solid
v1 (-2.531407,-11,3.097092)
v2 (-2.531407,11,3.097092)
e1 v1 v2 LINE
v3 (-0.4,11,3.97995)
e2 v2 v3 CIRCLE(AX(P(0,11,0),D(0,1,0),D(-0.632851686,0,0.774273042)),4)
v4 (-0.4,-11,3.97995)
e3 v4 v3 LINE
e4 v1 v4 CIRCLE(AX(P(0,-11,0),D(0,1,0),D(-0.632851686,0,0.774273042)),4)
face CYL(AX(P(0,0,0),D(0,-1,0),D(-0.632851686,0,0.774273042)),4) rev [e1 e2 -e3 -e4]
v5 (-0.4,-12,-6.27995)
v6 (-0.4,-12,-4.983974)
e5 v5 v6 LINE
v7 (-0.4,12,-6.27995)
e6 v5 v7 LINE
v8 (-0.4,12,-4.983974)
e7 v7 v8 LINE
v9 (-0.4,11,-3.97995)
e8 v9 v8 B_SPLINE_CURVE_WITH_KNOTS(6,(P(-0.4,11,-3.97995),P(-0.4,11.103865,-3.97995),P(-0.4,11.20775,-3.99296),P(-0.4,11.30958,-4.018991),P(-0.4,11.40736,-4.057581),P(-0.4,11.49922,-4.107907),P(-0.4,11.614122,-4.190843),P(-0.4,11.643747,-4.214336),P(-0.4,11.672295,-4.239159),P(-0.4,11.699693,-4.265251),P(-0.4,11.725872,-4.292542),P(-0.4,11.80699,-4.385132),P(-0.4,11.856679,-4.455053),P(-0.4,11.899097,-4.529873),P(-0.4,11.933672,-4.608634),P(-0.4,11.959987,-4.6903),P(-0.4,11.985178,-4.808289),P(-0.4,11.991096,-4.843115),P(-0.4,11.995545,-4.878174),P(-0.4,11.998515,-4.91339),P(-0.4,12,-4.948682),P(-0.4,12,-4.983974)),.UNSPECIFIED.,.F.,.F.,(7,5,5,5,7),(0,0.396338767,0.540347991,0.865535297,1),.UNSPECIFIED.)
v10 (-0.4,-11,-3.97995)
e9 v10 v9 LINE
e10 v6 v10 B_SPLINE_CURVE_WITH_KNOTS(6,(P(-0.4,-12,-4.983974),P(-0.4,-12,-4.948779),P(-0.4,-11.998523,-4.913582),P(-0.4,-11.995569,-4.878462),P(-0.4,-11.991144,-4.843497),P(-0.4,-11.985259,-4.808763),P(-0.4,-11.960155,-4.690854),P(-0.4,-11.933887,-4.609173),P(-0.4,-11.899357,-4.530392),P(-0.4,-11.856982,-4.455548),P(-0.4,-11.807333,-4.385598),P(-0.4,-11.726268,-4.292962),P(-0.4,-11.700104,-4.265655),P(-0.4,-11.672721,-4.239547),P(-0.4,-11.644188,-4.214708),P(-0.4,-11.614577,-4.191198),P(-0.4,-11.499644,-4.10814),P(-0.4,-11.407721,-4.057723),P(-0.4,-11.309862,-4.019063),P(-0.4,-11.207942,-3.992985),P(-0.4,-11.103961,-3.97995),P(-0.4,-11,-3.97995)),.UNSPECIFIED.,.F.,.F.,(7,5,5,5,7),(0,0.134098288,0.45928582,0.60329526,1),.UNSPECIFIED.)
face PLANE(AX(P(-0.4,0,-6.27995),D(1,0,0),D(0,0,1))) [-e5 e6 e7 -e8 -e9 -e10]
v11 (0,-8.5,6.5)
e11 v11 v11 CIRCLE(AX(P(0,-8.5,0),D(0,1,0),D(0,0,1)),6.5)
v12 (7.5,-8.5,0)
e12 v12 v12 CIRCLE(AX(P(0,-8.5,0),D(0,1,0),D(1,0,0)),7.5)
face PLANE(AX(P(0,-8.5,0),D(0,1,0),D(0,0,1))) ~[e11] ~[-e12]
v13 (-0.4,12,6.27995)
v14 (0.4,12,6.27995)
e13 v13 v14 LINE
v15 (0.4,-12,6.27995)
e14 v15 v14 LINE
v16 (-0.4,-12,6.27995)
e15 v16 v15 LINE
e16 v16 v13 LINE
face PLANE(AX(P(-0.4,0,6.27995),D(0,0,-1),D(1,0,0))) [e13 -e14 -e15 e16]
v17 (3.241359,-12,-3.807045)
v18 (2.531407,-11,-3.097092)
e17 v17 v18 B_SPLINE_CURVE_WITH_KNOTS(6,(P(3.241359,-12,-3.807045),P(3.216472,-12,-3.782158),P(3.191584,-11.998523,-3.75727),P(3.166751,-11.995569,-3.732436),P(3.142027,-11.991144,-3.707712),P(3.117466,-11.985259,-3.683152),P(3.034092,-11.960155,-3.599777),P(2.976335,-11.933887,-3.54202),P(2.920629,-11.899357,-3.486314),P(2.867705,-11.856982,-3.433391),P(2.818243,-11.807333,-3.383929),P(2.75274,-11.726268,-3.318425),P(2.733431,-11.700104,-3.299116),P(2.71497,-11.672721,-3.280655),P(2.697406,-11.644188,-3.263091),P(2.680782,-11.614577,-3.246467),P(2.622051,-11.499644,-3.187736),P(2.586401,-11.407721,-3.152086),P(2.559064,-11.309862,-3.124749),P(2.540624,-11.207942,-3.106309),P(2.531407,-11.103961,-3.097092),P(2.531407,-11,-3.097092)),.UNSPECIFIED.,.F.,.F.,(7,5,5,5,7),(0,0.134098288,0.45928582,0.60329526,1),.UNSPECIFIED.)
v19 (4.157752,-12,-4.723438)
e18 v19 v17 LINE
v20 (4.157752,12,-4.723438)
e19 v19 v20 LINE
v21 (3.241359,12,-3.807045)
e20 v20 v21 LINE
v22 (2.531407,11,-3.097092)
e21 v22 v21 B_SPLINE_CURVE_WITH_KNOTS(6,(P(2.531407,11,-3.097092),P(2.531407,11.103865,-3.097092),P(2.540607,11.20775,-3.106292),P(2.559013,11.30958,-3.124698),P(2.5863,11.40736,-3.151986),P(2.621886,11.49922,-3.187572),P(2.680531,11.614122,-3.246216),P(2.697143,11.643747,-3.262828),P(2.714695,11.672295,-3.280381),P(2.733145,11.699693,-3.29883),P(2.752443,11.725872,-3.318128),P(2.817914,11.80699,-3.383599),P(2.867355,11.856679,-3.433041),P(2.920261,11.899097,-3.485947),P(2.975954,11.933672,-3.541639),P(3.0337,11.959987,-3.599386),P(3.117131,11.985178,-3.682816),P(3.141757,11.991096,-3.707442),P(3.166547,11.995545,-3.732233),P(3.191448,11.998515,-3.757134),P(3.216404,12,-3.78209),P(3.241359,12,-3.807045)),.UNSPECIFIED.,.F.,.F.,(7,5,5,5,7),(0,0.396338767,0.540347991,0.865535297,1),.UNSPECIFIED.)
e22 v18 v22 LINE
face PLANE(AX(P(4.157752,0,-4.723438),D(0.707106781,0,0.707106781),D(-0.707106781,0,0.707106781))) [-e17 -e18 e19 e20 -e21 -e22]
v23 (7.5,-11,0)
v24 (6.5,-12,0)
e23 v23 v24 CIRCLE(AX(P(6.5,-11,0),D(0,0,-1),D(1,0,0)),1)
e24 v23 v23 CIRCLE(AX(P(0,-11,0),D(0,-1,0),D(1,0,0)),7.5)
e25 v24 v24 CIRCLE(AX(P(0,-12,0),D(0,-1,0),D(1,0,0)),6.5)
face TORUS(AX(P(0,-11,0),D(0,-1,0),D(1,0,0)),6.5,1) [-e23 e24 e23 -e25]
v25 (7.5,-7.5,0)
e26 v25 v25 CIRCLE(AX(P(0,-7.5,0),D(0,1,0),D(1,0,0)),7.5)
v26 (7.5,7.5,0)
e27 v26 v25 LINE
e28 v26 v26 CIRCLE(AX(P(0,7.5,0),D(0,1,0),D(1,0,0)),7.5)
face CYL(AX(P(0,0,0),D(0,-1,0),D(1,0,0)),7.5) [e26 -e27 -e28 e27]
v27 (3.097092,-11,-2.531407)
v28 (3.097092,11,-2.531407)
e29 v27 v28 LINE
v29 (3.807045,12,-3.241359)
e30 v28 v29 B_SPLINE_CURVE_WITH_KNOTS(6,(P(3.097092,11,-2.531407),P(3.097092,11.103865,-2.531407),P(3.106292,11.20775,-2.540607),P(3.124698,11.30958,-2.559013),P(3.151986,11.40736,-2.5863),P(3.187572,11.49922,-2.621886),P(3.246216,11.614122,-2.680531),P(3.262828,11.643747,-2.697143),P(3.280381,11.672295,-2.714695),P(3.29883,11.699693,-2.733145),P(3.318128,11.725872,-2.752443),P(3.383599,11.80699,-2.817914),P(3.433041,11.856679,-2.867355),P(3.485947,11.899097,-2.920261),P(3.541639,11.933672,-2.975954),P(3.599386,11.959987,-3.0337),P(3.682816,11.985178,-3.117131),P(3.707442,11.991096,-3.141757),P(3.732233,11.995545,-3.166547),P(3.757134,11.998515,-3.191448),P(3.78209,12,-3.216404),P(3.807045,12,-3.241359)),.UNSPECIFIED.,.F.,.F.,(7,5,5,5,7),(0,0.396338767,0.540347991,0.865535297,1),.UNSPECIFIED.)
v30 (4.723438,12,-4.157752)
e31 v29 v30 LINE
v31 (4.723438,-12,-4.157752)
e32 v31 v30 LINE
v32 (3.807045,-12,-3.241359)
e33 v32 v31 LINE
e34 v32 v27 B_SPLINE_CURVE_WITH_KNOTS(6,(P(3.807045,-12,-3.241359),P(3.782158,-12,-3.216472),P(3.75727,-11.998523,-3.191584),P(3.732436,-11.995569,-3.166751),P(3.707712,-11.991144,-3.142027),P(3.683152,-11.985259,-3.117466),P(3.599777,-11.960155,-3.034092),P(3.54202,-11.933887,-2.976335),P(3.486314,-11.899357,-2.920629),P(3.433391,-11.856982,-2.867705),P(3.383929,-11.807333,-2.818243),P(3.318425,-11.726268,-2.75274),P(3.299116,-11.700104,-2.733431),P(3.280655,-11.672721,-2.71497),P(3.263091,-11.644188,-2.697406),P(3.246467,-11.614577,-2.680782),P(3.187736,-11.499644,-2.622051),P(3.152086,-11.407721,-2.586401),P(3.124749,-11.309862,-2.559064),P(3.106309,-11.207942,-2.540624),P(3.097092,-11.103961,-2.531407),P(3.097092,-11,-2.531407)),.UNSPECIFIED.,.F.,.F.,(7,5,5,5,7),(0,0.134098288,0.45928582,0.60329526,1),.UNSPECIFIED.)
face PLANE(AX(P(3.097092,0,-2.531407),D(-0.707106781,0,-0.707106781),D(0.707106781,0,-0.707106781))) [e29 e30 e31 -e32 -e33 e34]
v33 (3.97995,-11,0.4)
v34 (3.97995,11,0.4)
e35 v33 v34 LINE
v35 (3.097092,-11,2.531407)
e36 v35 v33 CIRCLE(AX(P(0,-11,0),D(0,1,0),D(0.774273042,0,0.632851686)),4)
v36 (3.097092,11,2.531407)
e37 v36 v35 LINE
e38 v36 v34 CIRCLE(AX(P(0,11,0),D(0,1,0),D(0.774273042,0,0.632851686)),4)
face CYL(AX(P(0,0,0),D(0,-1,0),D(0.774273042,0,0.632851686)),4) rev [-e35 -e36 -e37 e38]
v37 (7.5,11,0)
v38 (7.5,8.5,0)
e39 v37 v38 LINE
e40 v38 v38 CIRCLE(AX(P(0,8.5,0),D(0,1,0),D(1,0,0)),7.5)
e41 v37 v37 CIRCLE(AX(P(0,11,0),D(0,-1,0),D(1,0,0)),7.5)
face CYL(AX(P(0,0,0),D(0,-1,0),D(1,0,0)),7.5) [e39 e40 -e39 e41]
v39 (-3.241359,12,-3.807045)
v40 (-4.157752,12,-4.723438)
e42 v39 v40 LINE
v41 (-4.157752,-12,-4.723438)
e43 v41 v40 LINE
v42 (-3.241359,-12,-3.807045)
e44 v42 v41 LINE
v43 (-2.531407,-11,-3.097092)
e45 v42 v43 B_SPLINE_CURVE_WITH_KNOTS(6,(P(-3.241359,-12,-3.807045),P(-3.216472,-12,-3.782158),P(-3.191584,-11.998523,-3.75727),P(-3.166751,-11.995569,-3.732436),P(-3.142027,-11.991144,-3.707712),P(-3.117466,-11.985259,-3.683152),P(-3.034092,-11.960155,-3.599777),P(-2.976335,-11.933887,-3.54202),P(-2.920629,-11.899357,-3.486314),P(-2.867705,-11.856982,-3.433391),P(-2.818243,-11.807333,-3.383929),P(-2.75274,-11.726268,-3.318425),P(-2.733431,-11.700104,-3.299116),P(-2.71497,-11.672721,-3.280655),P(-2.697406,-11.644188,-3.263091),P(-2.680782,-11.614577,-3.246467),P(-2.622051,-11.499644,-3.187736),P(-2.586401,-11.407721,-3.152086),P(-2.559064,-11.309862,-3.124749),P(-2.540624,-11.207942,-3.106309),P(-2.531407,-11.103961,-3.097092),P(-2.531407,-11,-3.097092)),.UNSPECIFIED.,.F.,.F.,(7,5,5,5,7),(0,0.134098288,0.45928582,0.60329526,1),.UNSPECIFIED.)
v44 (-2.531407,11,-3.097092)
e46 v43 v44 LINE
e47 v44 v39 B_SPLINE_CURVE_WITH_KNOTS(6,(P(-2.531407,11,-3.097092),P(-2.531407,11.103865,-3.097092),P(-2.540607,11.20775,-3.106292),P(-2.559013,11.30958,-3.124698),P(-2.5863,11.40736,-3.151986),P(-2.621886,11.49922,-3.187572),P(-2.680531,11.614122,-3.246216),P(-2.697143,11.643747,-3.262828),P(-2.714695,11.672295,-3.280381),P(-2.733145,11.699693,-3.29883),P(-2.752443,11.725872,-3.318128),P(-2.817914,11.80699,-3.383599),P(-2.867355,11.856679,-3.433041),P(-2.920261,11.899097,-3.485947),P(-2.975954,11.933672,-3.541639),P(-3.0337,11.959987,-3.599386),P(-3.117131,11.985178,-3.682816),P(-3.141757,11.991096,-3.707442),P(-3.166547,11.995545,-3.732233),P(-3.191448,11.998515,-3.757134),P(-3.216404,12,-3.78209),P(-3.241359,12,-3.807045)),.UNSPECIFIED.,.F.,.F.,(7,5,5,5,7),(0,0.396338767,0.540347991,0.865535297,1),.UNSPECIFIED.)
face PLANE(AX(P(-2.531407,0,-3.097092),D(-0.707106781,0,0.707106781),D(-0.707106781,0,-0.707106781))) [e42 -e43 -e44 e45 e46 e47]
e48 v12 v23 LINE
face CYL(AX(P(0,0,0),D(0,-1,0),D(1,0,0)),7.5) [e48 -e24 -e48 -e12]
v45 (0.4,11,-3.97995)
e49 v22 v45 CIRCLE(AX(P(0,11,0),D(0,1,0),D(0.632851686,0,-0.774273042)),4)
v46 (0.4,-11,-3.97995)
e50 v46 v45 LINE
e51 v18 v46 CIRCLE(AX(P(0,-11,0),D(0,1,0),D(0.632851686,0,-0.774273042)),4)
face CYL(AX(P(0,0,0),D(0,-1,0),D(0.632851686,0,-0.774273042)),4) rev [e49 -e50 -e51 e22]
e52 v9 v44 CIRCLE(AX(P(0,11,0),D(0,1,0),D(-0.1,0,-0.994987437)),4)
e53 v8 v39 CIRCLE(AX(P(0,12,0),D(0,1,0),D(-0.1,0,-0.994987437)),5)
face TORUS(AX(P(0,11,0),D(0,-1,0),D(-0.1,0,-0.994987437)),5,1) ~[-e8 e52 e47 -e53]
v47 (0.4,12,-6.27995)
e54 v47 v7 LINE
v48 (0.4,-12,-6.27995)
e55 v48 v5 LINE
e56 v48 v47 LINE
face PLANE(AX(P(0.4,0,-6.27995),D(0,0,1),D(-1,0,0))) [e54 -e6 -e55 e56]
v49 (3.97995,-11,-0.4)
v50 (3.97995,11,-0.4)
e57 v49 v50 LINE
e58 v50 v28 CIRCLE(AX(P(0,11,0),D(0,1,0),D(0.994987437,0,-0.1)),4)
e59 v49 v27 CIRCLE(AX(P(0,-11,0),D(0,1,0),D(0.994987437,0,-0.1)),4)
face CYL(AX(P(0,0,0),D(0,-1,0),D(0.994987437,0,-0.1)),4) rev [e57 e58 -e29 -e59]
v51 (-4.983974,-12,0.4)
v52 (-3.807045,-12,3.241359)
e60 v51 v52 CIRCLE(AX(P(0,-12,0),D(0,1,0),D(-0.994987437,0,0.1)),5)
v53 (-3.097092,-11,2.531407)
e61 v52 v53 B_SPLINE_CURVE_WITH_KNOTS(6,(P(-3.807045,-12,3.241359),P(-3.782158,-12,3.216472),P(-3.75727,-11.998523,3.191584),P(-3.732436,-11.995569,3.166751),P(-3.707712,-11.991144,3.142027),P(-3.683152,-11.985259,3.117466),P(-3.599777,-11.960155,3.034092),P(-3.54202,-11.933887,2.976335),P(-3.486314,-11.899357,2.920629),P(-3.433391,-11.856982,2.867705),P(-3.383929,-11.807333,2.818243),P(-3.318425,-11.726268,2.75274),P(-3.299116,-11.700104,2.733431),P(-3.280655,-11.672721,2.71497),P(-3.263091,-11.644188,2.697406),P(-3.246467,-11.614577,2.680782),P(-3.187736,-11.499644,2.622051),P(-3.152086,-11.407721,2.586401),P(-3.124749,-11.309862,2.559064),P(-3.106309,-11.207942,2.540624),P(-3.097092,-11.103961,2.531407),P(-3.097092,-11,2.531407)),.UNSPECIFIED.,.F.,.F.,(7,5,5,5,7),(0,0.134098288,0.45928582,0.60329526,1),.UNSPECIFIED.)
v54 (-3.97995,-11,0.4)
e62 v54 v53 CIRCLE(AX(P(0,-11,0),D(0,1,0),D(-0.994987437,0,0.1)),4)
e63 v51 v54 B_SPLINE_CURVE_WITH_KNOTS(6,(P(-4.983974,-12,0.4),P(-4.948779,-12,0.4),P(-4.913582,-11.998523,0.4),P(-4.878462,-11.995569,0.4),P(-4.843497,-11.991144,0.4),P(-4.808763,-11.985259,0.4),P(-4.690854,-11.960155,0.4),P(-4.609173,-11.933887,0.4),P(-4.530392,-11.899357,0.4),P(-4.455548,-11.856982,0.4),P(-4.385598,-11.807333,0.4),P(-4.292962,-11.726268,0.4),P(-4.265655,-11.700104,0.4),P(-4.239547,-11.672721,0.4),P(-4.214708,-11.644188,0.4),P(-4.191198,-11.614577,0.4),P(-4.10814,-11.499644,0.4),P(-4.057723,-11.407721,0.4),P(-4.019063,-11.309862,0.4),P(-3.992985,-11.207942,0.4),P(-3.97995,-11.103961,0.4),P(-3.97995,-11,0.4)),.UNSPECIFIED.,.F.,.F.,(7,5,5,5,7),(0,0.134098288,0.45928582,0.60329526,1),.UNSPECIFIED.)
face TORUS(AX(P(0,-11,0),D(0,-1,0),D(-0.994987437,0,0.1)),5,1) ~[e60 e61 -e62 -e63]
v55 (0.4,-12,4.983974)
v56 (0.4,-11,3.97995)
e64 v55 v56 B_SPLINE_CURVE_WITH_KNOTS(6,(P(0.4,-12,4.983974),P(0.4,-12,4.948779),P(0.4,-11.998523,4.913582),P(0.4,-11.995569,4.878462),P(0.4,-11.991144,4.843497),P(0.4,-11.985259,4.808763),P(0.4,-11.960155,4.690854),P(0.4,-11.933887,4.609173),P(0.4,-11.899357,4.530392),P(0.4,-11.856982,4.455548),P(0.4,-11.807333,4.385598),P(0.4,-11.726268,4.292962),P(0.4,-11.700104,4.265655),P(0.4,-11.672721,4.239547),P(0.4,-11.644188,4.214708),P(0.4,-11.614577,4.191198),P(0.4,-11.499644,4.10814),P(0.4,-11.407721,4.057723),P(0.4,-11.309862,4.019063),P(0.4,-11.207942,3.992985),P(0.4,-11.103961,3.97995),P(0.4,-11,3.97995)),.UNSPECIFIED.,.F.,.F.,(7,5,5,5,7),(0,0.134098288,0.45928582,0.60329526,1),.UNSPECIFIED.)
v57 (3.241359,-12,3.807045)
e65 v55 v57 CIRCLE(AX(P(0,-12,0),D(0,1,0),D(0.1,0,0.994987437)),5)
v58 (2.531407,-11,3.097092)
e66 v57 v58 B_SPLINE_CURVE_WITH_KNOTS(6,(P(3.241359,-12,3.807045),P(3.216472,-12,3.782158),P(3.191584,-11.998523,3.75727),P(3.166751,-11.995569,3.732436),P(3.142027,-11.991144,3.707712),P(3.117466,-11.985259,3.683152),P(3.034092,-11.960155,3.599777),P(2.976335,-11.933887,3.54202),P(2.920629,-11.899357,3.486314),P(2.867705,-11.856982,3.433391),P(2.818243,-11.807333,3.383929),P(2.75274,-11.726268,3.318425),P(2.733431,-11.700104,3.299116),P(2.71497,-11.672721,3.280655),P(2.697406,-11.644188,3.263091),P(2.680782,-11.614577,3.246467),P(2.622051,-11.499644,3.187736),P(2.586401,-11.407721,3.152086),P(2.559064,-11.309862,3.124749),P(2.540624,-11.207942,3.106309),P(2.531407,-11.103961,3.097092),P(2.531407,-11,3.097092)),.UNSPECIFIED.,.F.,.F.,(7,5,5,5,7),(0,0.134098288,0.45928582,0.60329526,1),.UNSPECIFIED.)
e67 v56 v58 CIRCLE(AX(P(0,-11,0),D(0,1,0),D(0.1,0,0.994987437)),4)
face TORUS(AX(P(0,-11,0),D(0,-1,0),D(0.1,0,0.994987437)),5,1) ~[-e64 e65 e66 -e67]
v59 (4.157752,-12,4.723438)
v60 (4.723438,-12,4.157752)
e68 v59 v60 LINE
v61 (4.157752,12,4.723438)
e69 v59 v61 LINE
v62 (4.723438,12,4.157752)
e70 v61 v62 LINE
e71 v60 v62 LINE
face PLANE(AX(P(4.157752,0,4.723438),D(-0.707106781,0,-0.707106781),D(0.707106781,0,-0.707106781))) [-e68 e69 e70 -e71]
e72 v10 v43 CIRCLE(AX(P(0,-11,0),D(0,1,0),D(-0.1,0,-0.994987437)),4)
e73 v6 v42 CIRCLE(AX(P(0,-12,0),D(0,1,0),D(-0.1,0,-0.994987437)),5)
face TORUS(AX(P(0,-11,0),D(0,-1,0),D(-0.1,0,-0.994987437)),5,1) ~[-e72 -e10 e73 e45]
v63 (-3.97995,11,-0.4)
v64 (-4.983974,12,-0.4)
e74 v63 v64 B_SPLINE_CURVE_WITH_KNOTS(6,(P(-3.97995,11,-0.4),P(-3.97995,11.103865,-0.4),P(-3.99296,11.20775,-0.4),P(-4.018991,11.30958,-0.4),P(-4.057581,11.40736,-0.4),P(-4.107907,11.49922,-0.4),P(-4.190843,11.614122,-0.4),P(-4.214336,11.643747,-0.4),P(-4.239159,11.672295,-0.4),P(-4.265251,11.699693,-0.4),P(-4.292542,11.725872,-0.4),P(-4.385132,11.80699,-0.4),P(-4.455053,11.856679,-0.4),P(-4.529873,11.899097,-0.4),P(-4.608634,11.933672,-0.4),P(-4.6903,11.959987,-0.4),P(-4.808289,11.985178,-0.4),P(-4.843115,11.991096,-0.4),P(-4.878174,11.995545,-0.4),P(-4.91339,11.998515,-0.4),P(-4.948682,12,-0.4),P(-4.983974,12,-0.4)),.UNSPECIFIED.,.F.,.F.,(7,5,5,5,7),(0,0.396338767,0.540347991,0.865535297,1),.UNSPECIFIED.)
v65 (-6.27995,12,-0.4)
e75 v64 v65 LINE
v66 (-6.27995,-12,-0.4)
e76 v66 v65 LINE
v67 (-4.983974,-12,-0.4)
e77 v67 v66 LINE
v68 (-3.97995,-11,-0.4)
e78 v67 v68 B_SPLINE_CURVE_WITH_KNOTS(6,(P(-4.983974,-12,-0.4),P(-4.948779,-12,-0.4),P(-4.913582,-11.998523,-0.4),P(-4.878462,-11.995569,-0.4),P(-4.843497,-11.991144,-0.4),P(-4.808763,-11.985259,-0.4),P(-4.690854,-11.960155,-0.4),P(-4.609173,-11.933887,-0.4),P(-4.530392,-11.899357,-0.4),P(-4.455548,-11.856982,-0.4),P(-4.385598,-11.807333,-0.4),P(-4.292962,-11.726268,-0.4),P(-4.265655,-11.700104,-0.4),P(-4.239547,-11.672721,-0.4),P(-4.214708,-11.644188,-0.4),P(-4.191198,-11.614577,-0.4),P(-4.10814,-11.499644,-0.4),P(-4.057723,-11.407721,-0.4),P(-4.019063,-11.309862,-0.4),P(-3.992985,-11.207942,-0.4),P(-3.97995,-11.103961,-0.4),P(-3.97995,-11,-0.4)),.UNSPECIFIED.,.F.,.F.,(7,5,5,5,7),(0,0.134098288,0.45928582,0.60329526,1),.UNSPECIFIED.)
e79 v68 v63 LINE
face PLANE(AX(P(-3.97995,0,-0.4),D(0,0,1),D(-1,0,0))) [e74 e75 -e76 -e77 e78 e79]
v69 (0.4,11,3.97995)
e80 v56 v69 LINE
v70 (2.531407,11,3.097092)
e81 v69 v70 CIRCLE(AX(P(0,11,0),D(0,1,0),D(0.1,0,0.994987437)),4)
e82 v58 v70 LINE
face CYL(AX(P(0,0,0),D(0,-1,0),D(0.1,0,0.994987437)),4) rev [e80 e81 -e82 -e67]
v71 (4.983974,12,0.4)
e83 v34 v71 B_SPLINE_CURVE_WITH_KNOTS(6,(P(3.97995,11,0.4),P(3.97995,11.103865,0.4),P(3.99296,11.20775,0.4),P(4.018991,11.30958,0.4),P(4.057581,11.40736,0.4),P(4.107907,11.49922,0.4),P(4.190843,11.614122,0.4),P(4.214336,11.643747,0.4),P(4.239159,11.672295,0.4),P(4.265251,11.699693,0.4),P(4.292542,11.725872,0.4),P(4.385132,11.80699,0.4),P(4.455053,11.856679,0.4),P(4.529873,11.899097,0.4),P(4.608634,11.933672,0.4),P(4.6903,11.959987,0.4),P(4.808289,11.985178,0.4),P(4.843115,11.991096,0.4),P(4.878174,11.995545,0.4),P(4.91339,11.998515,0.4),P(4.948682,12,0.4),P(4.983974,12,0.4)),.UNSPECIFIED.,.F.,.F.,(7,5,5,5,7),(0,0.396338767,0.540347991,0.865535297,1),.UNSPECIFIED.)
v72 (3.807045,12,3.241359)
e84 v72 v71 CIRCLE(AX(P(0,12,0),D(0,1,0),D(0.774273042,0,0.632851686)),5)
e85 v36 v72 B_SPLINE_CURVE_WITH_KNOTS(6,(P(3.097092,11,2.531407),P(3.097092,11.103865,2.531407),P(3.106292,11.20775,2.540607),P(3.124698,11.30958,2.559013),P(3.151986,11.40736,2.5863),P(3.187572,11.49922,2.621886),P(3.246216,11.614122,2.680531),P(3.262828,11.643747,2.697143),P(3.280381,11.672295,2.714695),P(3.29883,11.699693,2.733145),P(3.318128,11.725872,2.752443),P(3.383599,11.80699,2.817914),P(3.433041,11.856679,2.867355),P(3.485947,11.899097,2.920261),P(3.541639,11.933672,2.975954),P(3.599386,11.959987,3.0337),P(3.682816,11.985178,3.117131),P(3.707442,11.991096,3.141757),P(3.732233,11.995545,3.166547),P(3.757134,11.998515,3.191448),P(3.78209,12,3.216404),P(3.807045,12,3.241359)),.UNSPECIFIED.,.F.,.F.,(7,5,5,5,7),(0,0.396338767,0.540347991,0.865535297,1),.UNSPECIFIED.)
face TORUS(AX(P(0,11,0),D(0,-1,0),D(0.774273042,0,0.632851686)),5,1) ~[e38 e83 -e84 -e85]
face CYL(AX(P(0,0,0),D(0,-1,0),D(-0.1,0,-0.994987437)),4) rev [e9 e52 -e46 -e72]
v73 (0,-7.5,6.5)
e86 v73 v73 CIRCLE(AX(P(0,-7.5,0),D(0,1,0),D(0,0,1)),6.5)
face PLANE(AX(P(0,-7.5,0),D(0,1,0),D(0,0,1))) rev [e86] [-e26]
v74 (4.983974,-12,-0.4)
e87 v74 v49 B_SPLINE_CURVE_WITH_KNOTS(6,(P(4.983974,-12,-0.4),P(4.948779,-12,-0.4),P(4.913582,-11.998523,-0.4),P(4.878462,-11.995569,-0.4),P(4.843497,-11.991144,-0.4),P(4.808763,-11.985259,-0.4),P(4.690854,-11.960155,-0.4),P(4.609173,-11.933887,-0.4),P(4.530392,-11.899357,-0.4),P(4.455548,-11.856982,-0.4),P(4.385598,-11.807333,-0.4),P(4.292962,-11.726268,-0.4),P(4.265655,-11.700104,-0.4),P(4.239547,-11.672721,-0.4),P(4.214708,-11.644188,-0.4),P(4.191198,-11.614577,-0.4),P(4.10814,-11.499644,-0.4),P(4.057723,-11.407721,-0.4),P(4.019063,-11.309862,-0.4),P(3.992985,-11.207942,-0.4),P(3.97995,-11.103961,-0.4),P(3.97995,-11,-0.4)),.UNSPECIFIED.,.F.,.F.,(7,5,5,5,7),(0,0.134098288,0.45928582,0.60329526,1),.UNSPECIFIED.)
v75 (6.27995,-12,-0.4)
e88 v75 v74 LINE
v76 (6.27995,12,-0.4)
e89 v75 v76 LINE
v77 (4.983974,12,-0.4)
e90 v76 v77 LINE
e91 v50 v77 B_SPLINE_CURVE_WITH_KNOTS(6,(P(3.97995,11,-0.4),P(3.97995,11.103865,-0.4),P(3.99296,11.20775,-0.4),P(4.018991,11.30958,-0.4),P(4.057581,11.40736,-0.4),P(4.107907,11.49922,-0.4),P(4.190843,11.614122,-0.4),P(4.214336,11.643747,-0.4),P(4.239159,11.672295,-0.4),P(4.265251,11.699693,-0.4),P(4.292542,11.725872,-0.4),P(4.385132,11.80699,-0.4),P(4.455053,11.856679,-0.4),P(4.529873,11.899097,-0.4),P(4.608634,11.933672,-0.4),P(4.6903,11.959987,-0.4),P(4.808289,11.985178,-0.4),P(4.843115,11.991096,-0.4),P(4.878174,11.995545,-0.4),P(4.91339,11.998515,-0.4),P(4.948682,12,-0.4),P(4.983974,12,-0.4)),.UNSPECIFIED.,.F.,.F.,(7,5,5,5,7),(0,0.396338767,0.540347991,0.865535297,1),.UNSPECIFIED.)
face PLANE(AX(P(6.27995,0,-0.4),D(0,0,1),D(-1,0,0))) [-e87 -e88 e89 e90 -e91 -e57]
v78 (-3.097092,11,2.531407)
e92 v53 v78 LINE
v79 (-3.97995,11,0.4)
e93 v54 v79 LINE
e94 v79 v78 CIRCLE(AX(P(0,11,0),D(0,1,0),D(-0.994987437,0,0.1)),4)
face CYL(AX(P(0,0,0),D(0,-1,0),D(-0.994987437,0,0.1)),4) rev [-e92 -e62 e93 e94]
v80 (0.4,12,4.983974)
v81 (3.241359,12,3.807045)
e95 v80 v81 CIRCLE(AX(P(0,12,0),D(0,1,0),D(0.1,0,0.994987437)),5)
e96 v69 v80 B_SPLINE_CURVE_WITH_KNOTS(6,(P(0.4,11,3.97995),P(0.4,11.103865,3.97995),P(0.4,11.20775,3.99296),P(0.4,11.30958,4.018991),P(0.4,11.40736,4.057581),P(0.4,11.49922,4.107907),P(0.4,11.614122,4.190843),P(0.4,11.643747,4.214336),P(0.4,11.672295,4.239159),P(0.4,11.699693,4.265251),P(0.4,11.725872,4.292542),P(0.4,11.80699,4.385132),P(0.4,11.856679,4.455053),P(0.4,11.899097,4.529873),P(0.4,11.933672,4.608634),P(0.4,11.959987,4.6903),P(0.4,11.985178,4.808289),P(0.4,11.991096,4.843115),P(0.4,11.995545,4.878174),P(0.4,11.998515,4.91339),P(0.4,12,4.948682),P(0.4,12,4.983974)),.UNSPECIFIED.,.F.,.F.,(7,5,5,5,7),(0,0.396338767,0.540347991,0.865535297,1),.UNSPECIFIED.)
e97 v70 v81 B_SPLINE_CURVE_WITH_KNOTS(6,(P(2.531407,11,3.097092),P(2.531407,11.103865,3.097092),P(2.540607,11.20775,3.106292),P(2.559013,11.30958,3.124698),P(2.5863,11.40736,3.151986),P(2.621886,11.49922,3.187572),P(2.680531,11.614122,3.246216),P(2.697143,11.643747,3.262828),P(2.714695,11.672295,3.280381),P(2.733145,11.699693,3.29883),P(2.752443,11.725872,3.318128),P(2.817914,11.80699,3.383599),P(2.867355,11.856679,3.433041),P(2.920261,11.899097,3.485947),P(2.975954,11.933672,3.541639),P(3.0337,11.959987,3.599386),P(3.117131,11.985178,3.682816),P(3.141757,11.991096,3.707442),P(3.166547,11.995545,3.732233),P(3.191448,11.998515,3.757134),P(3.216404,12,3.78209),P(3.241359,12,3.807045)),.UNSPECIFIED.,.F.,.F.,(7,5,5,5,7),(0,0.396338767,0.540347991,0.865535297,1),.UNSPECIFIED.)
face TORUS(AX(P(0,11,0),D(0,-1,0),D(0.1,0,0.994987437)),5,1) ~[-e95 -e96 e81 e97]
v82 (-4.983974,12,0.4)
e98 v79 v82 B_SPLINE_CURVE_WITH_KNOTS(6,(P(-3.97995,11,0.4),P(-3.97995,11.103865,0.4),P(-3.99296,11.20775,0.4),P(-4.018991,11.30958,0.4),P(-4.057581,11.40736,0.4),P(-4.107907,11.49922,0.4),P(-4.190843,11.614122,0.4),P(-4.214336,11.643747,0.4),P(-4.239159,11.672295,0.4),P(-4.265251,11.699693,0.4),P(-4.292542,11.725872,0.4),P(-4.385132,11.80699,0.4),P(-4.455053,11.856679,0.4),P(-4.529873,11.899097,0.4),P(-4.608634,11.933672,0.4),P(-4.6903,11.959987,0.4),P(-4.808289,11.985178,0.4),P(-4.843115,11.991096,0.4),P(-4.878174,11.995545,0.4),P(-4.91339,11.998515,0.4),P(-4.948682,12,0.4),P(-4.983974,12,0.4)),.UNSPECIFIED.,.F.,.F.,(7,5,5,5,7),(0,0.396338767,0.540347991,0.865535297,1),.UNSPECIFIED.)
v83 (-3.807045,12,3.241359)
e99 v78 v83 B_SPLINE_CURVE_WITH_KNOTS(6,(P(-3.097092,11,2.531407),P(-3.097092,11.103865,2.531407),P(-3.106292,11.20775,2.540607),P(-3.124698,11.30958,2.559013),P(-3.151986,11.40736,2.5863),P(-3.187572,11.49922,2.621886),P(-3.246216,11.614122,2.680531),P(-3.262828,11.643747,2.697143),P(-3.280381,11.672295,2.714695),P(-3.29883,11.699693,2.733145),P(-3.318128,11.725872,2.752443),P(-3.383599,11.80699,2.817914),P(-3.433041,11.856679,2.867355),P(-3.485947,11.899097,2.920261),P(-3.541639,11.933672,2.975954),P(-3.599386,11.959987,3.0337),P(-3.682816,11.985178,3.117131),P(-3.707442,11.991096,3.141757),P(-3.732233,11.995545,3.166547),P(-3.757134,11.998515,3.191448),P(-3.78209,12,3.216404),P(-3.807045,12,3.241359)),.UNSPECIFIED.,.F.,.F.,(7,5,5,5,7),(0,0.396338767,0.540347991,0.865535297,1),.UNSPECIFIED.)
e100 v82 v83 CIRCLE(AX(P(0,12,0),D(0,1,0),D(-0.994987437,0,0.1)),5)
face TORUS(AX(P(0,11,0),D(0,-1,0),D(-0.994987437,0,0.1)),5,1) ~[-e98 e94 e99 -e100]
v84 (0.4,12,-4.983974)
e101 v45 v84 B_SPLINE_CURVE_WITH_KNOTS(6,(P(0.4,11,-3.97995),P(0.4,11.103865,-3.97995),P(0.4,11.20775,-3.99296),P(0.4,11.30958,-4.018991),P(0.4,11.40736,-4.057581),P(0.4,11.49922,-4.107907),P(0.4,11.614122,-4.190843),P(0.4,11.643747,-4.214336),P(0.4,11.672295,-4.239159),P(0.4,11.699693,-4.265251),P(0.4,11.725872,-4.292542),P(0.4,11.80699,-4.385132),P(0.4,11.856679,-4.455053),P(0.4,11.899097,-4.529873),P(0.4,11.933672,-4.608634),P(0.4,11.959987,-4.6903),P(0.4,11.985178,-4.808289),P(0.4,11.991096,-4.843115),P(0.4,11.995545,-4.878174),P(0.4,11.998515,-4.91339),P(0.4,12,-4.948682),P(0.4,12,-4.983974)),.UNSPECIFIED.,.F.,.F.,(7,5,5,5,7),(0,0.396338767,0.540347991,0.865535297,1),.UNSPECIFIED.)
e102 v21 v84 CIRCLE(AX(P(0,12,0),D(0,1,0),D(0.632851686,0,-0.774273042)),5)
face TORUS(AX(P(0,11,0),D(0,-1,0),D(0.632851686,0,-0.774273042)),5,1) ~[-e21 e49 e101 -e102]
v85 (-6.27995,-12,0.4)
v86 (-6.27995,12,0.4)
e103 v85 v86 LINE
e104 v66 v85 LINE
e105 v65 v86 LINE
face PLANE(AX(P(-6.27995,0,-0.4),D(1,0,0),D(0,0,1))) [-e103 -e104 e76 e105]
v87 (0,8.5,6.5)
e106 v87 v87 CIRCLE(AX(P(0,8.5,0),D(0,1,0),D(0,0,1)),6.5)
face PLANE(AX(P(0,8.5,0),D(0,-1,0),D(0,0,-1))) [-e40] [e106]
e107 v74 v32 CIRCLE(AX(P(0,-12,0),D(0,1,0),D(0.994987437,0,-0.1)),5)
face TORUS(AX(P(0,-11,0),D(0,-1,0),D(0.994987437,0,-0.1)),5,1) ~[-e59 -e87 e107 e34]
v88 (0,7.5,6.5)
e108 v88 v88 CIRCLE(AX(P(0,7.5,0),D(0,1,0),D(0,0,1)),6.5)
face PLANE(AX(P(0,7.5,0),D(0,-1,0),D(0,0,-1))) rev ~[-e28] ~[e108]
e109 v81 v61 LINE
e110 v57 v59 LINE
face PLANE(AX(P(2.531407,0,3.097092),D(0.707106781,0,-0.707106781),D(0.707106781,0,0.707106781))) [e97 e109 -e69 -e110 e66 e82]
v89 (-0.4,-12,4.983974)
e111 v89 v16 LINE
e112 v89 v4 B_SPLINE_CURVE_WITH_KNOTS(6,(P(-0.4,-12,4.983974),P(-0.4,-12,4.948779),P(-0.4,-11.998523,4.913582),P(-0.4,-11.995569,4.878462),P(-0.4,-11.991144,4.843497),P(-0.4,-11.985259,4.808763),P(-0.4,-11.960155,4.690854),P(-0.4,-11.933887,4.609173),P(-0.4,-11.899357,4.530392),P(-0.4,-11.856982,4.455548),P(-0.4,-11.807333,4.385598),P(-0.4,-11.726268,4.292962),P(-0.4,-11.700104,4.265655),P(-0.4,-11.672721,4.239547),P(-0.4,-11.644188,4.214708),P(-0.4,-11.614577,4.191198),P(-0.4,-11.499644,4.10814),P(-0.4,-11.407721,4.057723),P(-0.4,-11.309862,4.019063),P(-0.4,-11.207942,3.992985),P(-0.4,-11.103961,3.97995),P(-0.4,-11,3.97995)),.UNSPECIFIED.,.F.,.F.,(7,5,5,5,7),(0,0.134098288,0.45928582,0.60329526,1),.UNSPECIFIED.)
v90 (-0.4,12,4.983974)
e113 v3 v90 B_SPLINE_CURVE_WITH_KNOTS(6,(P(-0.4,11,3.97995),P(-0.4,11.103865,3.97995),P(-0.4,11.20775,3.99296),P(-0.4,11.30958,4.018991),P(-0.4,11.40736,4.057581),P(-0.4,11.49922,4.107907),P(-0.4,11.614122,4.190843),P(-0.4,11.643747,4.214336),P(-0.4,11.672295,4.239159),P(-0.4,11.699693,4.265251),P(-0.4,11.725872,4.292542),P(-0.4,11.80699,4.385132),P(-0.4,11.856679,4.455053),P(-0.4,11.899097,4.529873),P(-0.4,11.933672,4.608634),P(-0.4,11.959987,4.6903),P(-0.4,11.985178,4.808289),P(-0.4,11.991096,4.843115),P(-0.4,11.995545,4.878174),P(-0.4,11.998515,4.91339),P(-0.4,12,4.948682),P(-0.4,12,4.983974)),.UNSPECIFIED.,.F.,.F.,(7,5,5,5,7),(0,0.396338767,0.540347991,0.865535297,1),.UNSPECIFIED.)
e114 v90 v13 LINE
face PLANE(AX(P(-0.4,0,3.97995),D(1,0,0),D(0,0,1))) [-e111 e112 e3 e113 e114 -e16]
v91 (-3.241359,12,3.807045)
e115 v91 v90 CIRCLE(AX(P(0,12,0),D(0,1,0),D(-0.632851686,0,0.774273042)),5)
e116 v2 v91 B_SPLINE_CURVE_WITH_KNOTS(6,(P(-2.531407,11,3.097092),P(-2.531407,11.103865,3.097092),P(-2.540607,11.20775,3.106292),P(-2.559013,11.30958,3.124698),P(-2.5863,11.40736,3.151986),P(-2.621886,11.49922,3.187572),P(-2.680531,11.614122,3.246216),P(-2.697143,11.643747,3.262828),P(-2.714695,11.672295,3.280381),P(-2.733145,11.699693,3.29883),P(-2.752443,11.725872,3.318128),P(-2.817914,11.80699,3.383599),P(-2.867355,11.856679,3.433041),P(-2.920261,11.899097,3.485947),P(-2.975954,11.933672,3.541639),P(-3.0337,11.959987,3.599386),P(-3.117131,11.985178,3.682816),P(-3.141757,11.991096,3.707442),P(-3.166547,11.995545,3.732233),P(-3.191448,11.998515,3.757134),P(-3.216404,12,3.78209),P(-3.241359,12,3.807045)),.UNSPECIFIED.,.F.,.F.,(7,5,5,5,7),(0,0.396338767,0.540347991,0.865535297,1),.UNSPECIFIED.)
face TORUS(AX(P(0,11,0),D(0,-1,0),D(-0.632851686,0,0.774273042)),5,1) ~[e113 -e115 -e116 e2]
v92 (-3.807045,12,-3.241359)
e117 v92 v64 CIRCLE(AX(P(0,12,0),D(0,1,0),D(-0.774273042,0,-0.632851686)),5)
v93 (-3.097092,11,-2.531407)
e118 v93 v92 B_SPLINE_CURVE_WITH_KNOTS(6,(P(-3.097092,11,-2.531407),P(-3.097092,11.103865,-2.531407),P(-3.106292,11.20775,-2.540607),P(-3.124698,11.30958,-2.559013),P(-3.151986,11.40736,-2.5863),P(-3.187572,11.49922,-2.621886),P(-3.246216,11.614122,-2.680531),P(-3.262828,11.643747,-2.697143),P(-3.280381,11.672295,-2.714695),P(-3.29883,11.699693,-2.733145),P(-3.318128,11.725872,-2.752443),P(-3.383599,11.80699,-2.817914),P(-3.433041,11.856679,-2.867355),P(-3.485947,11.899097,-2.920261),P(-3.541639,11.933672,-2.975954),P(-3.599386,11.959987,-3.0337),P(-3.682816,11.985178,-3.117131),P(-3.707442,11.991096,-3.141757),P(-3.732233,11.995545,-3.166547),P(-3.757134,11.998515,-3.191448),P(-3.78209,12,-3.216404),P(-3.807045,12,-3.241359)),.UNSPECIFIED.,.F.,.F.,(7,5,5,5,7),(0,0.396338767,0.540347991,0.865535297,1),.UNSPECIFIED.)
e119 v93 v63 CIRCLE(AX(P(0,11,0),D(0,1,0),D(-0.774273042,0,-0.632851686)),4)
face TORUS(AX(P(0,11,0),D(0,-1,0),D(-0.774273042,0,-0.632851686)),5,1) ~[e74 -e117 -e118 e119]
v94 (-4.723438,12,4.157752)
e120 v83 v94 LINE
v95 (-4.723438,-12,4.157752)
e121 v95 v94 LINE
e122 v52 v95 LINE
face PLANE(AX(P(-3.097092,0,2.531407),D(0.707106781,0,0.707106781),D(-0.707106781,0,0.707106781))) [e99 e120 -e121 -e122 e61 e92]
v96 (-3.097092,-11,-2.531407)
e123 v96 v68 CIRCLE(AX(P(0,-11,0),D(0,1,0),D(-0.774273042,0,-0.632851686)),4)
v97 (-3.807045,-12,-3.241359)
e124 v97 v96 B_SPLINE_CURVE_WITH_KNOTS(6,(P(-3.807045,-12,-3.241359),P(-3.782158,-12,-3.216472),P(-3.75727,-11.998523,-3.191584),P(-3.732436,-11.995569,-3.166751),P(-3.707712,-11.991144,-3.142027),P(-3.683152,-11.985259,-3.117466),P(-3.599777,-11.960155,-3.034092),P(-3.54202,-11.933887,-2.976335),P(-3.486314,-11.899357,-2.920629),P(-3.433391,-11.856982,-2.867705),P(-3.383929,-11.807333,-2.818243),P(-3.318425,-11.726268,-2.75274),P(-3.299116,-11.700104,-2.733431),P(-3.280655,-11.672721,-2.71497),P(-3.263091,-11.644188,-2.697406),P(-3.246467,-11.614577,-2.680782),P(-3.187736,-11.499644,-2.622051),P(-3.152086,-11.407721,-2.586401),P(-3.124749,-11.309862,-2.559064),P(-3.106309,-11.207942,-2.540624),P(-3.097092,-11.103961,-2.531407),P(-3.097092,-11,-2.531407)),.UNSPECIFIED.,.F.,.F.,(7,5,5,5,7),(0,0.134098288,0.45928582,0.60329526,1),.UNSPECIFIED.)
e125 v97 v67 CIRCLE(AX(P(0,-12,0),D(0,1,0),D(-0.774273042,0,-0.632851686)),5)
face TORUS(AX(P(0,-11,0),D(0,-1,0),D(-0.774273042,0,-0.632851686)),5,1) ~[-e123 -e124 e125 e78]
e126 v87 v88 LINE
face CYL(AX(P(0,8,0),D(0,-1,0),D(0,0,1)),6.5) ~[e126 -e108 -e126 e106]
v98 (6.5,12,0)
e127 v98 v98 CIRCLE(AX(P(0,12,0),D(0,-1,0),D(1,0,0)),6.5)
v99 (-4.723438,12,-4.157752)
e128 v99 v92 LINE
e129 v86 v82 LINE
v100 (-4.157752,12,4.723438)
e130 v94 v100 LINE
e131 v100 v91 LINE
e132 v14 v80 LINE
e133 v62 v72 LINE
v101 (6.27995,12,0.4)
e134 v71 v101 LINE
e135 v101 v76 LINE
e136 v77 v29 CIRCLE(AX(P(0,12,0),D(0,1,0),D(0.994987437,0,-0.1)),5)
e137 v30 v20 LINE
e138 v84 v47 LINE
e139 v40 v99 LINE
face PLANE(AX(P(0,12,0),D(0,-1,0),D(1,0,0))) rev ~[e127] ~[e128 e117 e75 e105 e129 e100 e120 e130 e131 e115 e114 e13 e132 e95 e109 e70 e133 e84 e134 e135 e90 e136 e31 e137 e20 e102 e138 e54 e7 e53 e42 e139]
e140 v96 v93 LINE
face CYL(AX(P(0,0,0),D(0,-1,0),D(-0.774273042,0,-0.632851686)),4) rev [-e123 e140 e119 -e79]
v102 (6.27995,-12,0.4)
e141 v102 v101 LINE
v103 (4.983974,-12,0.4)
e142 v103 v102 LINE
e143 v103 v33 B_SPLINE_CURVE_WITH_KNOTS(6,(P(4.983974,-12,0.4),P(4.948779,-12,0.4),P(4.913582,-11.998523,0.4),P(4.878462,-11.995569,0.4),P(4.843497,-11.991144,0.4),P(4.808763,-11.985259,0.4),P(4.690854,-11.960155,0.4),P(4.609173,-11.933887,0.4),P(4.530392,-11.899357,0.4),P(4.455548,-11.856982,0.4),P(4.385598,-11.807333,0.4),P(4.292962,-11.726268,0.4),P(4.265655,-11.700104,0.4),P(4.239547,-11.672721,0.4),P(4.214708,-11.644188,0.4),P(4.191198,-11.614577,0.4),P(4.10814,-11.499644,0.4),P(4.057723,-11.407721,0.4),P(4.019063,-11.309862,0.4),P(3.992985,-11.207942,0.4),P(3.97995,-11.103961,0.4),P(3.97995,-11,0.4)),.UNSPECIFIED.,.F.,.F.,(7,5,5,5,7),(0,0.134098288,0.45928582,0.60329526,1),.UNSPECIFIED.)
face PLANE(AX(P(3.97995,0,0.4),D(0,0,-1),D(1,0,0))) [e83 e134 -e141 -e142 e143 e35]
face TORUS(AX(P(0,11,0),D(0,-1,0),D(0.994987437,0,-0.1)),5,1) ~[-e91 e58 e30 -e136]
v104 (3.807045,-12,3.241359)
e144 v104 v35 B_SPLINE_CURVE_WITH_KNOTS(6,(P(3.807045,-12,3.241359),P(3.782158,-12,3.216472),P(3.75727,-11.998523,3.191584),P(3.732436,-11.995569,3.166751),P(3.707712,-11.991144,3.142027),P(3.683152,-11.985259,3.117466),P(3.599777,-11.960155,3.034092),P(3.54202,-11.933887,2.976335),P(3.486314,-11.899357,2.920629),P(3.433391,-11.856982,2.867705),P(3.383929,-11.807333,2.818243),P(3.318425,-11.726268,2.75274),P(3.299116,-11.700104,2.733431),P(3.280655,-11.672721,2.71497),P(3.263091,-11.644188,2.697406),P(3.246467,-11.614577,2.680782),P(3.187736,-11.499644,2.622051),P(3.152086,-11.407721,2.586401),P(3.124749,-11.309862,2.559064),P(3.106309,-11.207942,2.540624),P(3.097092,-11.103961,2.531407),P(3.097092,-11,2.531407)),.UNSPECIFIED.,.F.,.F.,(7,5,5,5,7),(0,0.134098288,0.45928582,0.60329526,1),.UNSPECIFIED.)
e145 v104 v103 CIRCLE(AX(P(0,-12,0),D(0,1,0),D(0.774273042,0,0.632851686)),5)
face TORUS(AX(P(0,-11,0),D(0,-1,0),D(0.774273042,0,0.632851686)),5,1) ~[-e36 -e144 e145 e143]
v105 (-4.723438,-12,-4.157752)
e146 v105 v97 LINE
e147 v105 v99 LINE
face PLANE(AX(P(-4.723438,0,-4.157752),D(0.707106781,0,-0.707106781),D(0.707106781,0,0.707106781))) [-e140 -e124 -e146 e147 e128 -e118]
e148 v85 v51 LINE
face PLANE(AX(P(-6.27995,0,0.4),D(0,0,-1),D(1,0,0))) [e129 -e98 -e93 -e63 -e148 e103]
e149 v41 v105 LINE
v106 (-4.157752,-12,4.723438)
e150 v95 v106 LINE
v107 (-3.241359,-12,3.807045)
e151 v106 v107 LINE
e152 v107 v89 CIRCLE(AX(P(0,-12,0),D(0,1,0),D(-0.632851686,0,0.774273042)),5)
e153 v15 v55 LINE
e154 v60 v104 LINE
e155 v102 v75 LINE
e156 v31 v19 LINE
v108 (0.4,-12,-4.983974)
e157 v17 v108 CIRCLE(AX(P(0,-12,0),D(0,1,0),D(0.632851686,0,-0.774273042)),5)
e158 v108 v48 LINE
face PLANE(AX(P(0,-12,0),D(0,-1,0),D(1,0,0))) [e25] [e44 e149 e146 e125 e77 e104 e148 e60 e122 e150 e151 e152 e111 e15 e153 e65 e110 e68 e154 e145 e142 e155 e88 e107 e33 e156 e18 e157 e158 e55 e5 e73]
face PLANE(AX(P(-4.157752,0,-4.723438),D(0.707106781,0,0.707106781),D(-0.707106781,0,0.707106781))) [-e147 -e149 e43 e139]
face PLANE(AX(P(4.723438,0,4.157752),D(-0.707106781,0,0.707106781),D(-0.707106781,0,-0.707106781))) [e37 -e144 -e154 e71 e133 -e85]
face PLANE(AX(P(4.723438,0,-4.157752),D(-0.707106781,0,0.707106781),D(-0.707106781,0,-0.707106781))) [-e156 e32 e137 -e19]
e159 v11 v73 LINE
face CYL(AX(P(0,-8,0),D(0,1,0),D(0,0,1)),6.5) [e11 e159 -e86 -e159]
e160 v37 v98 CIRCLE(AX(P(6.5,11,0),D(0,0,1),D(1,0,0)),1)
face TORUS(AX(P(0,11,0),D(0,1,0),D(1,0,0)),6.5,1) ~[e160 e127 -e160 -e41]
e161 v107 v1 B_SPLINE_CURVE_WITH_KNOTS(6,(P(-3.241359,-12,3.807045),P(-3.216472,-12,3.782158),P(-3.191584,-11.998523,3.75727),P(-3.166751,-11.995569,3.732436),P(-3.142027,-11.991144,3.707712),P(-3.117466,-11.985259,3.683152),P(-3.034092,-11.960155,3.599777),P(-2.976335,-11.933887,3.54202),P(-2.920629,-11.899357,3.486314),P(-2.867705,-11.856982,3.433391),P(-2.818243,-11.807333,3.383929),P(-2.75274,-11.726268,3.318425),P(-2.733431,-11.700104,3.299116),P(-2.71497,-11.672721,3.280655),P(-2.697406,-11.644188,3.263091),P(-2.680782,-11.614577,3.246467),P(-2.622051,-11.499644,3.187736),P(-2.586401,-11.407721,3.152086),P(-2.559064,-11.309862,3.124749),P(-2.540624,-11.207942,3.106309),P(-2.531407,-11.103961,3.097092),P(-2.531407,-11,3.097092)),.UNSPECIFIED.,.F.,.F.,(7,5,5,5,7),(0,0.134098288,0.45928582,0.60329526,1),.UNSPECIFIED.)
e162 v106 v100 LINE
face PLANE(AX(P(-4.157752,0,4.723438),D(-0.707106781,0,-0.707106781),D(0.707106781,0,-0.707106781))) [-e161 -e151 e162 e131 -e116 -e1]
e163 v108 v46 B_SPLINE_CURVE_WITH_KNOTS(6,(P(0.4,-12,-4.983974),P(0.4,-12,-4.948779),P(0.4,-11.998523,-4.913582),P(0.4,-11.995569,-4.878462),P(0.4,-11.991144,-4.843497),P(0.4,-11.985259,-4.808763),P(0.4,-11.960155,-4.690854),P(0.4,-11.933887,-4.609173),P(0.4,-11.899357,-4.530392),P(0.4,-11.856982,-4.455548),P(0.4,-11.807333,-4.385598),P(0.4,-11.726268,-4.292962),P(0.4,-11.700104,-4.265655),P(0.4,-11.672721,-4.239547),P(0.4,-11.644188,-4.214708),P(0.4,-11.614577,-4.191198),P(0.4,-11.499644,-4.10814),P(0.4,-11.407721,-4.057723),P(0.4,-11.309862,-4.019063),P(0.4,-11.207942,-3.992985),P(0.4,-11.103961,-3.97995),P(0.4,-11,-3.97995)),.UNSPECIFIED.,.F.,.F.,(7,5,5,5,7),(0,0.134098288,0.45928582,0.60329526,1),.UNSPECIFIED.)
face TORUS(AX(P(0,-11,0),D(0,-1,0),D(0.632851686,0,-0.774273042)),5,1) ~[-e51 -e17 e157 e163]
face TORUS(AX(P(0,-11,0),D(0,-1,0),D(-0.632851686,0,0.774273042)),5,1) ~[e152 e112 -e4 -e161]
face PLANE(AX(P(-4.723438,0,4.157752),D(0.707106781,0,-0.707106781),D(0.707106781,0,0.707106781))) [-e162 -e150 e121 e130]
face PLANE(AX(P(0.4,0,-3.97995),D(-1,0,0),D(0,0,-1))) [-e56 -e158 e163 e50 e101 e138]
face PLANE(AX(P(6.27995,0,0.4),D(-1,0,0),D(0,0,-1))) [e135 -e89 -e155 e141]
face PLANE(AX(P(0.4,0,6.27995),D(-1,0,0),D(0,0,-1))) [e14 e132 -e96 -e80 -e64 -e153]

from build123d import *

# Parameters (mm, degrees)
F0_R     = 7.5
F1_DEPTH = 12
F2_R     = 1
F3_W     = 1
F3_H     = 1


# Not quite as in the source:
# - a pattern or mirror of a feature is missing from the dataset's text; its kind, count and spacing are read off the source's solid


with BuildPart() as f1:
    # F0 (on Front) → F1 (new body, symmetric)
    with BuildSketch(Plane.XZ):
        Circle(F0_R)
        with BuildLine():
            ThreePointArc((3.0970921684, 2.5314067434), (3.69551813, 1.5307337295), (3.9799497484, 0.4))
            Line((3.9799497484, 0.4), (6.2799497484, 0.4))
            Line((6.2799497484, 0.4), (6.2799497484, -0.4))
            Line((6.2799497484, -0.4), (3.9799497484, -0.4))
            ThreePointArc((3.9799497484, -0.4), (3.69551813, -1.5307337295), (3.0970921684, -2.5314067434))
            Line((3.0970921684, -2.5314067434), (4.7234377651, -4.1577523401))
            Line((4.7234377651, -4.1577523401), (4.1577523401, -4.7234377651))
            Line((4.1577523401, -4.7234377651), (2.5314067434, -3.0970921684))
            ThreePointArc((2.5314067434, -3.0970921684), (1.5307337295, -3.69551813), (0.4, -3.9799497484))
            Line((0.4, -3.9799497484), (0.4, -6.2799497484))
            Line((0.4, -6.2799497484), (-0.4, -6.2799497484))
            Line((-0.4, -6.2799497484), (-0.4, -3.9799497484))
            ThreePointArc((-0.4, -3.9799497484), (-1.5307337295, -3.69551813), (-2.5314067434, -3.0970921684))
            Line((-2.5314067434, -3.0970921684), (-4.1577523401, -4.7234377651))
            Line((-4.1577523401, -4.7234377651), (-4.7234377651, -4.1577523401))
            Line((-4.7234377651, -4.1577523401), (-3.0970921684, -2.5314067434))
            ThreePointArc((-3.0970921684, -2.5314067434), (-3.69551813, -1.5307337295), (-3.9799497484, -0.4))
            Line((-3.9799497484, -0.4), (-6.2799497484, -0.4))
            Line((-6.2799497484, -0.4), (-6.2799497484, 0.4))
            Line((-6.2799497484, 0.4), (-3.9799497484, 0.4))
            ThreePointArc((-3.9799497484, 0.4), (-3.69551813, 1.5307337295), (-3.0970921684, 2.5314067434))
            Line((-3.0970921684, 2.5314067434), (-4.7234377651, 4.1577523401))
            Line((-4.7234377651, 4.1577523401), (-4.1577523401, 4.7234377651))
            Line((-4.1577523401, 4.7234377651), (-2.5314067434, 3.0970921684))
            ThreePointArc((-2.5314067434, 3.0970921684), (-1.5307337295, 3.69551813), (-0.4, 3.9799497484))
            Line((-0.4, 3.9799497484), (-0.4, 6.2799497484))
            Line((-0.4, 6.2799497484), (0.4, 6.2799497484))
            Line((0.4, 6.2799497484), (0.4, 3.9799497484))
            ThreePointArc((0.4, 3.9799497484), (1.5307337295, 3.69551813), (2.5314067434, 3.0970921684))
            Line((2.5314067434, 3.0970921684), (4.1577523401, 4.7234377651))
            Line((4.1577523401, 4.7234377651), (4.7234377651, 4.1577523401))
            Line((4.7234377651, 4.1577523401), (3.0970921684, 2.5314067434))
        make_face(mode=Mode.SUBTRACT)
    extrude(amount=F1_DEPTH, both=True)

    # F2
    f2_edges = [f1.edges().sort_by_distance(p)[0] for p in [
        (-7.5, -12, 0),
        (-1.530734, -12, 3.695518),
        (-3.695518, -12, 1.530734),
        (-3.695518, -12, -1.530734),
        (-1.530734, -12, -3.695518),
        (1.530734, -12, -3.695518),
        (3.695518, -12, -1.530734),
        (3.695518, -12, 1.530734),
        (1.530734, -12, 3.695518),
        (-7.5, 12, 0),
        (3.695518, 12, -1.530734),
        (3.695518, 12, 1.530734),
        (1.530734, 12, 3.695518),
        (-1.530734, 12, 3.695518),
        (-3.695518, 12, 1.530734),
        (-3.695518, 12, -1.530734),
        (-1.530734, 12, -3.695518),
        (1.530734, 12, -3.695518),
    ]]
    fillet(f2_edges, radius=F2_R)

    # F3 (on Right) → F4 (revolve, cut)
    with BuildSketch(Plane.YZ):
        with Locations((-8, 7)):
            Rectangle(F3_W, F3_H)
    f4 = revolve(axis=Axis((0, 11.2657039426, 0), (0, 1, 0)), mode=Mode.SUBTRACT)

    # F4_copies: F4 across plane
    add(f4.mirror(Plane.ZX), mode=Mode.SUBTRACT)


solid = f1.part
